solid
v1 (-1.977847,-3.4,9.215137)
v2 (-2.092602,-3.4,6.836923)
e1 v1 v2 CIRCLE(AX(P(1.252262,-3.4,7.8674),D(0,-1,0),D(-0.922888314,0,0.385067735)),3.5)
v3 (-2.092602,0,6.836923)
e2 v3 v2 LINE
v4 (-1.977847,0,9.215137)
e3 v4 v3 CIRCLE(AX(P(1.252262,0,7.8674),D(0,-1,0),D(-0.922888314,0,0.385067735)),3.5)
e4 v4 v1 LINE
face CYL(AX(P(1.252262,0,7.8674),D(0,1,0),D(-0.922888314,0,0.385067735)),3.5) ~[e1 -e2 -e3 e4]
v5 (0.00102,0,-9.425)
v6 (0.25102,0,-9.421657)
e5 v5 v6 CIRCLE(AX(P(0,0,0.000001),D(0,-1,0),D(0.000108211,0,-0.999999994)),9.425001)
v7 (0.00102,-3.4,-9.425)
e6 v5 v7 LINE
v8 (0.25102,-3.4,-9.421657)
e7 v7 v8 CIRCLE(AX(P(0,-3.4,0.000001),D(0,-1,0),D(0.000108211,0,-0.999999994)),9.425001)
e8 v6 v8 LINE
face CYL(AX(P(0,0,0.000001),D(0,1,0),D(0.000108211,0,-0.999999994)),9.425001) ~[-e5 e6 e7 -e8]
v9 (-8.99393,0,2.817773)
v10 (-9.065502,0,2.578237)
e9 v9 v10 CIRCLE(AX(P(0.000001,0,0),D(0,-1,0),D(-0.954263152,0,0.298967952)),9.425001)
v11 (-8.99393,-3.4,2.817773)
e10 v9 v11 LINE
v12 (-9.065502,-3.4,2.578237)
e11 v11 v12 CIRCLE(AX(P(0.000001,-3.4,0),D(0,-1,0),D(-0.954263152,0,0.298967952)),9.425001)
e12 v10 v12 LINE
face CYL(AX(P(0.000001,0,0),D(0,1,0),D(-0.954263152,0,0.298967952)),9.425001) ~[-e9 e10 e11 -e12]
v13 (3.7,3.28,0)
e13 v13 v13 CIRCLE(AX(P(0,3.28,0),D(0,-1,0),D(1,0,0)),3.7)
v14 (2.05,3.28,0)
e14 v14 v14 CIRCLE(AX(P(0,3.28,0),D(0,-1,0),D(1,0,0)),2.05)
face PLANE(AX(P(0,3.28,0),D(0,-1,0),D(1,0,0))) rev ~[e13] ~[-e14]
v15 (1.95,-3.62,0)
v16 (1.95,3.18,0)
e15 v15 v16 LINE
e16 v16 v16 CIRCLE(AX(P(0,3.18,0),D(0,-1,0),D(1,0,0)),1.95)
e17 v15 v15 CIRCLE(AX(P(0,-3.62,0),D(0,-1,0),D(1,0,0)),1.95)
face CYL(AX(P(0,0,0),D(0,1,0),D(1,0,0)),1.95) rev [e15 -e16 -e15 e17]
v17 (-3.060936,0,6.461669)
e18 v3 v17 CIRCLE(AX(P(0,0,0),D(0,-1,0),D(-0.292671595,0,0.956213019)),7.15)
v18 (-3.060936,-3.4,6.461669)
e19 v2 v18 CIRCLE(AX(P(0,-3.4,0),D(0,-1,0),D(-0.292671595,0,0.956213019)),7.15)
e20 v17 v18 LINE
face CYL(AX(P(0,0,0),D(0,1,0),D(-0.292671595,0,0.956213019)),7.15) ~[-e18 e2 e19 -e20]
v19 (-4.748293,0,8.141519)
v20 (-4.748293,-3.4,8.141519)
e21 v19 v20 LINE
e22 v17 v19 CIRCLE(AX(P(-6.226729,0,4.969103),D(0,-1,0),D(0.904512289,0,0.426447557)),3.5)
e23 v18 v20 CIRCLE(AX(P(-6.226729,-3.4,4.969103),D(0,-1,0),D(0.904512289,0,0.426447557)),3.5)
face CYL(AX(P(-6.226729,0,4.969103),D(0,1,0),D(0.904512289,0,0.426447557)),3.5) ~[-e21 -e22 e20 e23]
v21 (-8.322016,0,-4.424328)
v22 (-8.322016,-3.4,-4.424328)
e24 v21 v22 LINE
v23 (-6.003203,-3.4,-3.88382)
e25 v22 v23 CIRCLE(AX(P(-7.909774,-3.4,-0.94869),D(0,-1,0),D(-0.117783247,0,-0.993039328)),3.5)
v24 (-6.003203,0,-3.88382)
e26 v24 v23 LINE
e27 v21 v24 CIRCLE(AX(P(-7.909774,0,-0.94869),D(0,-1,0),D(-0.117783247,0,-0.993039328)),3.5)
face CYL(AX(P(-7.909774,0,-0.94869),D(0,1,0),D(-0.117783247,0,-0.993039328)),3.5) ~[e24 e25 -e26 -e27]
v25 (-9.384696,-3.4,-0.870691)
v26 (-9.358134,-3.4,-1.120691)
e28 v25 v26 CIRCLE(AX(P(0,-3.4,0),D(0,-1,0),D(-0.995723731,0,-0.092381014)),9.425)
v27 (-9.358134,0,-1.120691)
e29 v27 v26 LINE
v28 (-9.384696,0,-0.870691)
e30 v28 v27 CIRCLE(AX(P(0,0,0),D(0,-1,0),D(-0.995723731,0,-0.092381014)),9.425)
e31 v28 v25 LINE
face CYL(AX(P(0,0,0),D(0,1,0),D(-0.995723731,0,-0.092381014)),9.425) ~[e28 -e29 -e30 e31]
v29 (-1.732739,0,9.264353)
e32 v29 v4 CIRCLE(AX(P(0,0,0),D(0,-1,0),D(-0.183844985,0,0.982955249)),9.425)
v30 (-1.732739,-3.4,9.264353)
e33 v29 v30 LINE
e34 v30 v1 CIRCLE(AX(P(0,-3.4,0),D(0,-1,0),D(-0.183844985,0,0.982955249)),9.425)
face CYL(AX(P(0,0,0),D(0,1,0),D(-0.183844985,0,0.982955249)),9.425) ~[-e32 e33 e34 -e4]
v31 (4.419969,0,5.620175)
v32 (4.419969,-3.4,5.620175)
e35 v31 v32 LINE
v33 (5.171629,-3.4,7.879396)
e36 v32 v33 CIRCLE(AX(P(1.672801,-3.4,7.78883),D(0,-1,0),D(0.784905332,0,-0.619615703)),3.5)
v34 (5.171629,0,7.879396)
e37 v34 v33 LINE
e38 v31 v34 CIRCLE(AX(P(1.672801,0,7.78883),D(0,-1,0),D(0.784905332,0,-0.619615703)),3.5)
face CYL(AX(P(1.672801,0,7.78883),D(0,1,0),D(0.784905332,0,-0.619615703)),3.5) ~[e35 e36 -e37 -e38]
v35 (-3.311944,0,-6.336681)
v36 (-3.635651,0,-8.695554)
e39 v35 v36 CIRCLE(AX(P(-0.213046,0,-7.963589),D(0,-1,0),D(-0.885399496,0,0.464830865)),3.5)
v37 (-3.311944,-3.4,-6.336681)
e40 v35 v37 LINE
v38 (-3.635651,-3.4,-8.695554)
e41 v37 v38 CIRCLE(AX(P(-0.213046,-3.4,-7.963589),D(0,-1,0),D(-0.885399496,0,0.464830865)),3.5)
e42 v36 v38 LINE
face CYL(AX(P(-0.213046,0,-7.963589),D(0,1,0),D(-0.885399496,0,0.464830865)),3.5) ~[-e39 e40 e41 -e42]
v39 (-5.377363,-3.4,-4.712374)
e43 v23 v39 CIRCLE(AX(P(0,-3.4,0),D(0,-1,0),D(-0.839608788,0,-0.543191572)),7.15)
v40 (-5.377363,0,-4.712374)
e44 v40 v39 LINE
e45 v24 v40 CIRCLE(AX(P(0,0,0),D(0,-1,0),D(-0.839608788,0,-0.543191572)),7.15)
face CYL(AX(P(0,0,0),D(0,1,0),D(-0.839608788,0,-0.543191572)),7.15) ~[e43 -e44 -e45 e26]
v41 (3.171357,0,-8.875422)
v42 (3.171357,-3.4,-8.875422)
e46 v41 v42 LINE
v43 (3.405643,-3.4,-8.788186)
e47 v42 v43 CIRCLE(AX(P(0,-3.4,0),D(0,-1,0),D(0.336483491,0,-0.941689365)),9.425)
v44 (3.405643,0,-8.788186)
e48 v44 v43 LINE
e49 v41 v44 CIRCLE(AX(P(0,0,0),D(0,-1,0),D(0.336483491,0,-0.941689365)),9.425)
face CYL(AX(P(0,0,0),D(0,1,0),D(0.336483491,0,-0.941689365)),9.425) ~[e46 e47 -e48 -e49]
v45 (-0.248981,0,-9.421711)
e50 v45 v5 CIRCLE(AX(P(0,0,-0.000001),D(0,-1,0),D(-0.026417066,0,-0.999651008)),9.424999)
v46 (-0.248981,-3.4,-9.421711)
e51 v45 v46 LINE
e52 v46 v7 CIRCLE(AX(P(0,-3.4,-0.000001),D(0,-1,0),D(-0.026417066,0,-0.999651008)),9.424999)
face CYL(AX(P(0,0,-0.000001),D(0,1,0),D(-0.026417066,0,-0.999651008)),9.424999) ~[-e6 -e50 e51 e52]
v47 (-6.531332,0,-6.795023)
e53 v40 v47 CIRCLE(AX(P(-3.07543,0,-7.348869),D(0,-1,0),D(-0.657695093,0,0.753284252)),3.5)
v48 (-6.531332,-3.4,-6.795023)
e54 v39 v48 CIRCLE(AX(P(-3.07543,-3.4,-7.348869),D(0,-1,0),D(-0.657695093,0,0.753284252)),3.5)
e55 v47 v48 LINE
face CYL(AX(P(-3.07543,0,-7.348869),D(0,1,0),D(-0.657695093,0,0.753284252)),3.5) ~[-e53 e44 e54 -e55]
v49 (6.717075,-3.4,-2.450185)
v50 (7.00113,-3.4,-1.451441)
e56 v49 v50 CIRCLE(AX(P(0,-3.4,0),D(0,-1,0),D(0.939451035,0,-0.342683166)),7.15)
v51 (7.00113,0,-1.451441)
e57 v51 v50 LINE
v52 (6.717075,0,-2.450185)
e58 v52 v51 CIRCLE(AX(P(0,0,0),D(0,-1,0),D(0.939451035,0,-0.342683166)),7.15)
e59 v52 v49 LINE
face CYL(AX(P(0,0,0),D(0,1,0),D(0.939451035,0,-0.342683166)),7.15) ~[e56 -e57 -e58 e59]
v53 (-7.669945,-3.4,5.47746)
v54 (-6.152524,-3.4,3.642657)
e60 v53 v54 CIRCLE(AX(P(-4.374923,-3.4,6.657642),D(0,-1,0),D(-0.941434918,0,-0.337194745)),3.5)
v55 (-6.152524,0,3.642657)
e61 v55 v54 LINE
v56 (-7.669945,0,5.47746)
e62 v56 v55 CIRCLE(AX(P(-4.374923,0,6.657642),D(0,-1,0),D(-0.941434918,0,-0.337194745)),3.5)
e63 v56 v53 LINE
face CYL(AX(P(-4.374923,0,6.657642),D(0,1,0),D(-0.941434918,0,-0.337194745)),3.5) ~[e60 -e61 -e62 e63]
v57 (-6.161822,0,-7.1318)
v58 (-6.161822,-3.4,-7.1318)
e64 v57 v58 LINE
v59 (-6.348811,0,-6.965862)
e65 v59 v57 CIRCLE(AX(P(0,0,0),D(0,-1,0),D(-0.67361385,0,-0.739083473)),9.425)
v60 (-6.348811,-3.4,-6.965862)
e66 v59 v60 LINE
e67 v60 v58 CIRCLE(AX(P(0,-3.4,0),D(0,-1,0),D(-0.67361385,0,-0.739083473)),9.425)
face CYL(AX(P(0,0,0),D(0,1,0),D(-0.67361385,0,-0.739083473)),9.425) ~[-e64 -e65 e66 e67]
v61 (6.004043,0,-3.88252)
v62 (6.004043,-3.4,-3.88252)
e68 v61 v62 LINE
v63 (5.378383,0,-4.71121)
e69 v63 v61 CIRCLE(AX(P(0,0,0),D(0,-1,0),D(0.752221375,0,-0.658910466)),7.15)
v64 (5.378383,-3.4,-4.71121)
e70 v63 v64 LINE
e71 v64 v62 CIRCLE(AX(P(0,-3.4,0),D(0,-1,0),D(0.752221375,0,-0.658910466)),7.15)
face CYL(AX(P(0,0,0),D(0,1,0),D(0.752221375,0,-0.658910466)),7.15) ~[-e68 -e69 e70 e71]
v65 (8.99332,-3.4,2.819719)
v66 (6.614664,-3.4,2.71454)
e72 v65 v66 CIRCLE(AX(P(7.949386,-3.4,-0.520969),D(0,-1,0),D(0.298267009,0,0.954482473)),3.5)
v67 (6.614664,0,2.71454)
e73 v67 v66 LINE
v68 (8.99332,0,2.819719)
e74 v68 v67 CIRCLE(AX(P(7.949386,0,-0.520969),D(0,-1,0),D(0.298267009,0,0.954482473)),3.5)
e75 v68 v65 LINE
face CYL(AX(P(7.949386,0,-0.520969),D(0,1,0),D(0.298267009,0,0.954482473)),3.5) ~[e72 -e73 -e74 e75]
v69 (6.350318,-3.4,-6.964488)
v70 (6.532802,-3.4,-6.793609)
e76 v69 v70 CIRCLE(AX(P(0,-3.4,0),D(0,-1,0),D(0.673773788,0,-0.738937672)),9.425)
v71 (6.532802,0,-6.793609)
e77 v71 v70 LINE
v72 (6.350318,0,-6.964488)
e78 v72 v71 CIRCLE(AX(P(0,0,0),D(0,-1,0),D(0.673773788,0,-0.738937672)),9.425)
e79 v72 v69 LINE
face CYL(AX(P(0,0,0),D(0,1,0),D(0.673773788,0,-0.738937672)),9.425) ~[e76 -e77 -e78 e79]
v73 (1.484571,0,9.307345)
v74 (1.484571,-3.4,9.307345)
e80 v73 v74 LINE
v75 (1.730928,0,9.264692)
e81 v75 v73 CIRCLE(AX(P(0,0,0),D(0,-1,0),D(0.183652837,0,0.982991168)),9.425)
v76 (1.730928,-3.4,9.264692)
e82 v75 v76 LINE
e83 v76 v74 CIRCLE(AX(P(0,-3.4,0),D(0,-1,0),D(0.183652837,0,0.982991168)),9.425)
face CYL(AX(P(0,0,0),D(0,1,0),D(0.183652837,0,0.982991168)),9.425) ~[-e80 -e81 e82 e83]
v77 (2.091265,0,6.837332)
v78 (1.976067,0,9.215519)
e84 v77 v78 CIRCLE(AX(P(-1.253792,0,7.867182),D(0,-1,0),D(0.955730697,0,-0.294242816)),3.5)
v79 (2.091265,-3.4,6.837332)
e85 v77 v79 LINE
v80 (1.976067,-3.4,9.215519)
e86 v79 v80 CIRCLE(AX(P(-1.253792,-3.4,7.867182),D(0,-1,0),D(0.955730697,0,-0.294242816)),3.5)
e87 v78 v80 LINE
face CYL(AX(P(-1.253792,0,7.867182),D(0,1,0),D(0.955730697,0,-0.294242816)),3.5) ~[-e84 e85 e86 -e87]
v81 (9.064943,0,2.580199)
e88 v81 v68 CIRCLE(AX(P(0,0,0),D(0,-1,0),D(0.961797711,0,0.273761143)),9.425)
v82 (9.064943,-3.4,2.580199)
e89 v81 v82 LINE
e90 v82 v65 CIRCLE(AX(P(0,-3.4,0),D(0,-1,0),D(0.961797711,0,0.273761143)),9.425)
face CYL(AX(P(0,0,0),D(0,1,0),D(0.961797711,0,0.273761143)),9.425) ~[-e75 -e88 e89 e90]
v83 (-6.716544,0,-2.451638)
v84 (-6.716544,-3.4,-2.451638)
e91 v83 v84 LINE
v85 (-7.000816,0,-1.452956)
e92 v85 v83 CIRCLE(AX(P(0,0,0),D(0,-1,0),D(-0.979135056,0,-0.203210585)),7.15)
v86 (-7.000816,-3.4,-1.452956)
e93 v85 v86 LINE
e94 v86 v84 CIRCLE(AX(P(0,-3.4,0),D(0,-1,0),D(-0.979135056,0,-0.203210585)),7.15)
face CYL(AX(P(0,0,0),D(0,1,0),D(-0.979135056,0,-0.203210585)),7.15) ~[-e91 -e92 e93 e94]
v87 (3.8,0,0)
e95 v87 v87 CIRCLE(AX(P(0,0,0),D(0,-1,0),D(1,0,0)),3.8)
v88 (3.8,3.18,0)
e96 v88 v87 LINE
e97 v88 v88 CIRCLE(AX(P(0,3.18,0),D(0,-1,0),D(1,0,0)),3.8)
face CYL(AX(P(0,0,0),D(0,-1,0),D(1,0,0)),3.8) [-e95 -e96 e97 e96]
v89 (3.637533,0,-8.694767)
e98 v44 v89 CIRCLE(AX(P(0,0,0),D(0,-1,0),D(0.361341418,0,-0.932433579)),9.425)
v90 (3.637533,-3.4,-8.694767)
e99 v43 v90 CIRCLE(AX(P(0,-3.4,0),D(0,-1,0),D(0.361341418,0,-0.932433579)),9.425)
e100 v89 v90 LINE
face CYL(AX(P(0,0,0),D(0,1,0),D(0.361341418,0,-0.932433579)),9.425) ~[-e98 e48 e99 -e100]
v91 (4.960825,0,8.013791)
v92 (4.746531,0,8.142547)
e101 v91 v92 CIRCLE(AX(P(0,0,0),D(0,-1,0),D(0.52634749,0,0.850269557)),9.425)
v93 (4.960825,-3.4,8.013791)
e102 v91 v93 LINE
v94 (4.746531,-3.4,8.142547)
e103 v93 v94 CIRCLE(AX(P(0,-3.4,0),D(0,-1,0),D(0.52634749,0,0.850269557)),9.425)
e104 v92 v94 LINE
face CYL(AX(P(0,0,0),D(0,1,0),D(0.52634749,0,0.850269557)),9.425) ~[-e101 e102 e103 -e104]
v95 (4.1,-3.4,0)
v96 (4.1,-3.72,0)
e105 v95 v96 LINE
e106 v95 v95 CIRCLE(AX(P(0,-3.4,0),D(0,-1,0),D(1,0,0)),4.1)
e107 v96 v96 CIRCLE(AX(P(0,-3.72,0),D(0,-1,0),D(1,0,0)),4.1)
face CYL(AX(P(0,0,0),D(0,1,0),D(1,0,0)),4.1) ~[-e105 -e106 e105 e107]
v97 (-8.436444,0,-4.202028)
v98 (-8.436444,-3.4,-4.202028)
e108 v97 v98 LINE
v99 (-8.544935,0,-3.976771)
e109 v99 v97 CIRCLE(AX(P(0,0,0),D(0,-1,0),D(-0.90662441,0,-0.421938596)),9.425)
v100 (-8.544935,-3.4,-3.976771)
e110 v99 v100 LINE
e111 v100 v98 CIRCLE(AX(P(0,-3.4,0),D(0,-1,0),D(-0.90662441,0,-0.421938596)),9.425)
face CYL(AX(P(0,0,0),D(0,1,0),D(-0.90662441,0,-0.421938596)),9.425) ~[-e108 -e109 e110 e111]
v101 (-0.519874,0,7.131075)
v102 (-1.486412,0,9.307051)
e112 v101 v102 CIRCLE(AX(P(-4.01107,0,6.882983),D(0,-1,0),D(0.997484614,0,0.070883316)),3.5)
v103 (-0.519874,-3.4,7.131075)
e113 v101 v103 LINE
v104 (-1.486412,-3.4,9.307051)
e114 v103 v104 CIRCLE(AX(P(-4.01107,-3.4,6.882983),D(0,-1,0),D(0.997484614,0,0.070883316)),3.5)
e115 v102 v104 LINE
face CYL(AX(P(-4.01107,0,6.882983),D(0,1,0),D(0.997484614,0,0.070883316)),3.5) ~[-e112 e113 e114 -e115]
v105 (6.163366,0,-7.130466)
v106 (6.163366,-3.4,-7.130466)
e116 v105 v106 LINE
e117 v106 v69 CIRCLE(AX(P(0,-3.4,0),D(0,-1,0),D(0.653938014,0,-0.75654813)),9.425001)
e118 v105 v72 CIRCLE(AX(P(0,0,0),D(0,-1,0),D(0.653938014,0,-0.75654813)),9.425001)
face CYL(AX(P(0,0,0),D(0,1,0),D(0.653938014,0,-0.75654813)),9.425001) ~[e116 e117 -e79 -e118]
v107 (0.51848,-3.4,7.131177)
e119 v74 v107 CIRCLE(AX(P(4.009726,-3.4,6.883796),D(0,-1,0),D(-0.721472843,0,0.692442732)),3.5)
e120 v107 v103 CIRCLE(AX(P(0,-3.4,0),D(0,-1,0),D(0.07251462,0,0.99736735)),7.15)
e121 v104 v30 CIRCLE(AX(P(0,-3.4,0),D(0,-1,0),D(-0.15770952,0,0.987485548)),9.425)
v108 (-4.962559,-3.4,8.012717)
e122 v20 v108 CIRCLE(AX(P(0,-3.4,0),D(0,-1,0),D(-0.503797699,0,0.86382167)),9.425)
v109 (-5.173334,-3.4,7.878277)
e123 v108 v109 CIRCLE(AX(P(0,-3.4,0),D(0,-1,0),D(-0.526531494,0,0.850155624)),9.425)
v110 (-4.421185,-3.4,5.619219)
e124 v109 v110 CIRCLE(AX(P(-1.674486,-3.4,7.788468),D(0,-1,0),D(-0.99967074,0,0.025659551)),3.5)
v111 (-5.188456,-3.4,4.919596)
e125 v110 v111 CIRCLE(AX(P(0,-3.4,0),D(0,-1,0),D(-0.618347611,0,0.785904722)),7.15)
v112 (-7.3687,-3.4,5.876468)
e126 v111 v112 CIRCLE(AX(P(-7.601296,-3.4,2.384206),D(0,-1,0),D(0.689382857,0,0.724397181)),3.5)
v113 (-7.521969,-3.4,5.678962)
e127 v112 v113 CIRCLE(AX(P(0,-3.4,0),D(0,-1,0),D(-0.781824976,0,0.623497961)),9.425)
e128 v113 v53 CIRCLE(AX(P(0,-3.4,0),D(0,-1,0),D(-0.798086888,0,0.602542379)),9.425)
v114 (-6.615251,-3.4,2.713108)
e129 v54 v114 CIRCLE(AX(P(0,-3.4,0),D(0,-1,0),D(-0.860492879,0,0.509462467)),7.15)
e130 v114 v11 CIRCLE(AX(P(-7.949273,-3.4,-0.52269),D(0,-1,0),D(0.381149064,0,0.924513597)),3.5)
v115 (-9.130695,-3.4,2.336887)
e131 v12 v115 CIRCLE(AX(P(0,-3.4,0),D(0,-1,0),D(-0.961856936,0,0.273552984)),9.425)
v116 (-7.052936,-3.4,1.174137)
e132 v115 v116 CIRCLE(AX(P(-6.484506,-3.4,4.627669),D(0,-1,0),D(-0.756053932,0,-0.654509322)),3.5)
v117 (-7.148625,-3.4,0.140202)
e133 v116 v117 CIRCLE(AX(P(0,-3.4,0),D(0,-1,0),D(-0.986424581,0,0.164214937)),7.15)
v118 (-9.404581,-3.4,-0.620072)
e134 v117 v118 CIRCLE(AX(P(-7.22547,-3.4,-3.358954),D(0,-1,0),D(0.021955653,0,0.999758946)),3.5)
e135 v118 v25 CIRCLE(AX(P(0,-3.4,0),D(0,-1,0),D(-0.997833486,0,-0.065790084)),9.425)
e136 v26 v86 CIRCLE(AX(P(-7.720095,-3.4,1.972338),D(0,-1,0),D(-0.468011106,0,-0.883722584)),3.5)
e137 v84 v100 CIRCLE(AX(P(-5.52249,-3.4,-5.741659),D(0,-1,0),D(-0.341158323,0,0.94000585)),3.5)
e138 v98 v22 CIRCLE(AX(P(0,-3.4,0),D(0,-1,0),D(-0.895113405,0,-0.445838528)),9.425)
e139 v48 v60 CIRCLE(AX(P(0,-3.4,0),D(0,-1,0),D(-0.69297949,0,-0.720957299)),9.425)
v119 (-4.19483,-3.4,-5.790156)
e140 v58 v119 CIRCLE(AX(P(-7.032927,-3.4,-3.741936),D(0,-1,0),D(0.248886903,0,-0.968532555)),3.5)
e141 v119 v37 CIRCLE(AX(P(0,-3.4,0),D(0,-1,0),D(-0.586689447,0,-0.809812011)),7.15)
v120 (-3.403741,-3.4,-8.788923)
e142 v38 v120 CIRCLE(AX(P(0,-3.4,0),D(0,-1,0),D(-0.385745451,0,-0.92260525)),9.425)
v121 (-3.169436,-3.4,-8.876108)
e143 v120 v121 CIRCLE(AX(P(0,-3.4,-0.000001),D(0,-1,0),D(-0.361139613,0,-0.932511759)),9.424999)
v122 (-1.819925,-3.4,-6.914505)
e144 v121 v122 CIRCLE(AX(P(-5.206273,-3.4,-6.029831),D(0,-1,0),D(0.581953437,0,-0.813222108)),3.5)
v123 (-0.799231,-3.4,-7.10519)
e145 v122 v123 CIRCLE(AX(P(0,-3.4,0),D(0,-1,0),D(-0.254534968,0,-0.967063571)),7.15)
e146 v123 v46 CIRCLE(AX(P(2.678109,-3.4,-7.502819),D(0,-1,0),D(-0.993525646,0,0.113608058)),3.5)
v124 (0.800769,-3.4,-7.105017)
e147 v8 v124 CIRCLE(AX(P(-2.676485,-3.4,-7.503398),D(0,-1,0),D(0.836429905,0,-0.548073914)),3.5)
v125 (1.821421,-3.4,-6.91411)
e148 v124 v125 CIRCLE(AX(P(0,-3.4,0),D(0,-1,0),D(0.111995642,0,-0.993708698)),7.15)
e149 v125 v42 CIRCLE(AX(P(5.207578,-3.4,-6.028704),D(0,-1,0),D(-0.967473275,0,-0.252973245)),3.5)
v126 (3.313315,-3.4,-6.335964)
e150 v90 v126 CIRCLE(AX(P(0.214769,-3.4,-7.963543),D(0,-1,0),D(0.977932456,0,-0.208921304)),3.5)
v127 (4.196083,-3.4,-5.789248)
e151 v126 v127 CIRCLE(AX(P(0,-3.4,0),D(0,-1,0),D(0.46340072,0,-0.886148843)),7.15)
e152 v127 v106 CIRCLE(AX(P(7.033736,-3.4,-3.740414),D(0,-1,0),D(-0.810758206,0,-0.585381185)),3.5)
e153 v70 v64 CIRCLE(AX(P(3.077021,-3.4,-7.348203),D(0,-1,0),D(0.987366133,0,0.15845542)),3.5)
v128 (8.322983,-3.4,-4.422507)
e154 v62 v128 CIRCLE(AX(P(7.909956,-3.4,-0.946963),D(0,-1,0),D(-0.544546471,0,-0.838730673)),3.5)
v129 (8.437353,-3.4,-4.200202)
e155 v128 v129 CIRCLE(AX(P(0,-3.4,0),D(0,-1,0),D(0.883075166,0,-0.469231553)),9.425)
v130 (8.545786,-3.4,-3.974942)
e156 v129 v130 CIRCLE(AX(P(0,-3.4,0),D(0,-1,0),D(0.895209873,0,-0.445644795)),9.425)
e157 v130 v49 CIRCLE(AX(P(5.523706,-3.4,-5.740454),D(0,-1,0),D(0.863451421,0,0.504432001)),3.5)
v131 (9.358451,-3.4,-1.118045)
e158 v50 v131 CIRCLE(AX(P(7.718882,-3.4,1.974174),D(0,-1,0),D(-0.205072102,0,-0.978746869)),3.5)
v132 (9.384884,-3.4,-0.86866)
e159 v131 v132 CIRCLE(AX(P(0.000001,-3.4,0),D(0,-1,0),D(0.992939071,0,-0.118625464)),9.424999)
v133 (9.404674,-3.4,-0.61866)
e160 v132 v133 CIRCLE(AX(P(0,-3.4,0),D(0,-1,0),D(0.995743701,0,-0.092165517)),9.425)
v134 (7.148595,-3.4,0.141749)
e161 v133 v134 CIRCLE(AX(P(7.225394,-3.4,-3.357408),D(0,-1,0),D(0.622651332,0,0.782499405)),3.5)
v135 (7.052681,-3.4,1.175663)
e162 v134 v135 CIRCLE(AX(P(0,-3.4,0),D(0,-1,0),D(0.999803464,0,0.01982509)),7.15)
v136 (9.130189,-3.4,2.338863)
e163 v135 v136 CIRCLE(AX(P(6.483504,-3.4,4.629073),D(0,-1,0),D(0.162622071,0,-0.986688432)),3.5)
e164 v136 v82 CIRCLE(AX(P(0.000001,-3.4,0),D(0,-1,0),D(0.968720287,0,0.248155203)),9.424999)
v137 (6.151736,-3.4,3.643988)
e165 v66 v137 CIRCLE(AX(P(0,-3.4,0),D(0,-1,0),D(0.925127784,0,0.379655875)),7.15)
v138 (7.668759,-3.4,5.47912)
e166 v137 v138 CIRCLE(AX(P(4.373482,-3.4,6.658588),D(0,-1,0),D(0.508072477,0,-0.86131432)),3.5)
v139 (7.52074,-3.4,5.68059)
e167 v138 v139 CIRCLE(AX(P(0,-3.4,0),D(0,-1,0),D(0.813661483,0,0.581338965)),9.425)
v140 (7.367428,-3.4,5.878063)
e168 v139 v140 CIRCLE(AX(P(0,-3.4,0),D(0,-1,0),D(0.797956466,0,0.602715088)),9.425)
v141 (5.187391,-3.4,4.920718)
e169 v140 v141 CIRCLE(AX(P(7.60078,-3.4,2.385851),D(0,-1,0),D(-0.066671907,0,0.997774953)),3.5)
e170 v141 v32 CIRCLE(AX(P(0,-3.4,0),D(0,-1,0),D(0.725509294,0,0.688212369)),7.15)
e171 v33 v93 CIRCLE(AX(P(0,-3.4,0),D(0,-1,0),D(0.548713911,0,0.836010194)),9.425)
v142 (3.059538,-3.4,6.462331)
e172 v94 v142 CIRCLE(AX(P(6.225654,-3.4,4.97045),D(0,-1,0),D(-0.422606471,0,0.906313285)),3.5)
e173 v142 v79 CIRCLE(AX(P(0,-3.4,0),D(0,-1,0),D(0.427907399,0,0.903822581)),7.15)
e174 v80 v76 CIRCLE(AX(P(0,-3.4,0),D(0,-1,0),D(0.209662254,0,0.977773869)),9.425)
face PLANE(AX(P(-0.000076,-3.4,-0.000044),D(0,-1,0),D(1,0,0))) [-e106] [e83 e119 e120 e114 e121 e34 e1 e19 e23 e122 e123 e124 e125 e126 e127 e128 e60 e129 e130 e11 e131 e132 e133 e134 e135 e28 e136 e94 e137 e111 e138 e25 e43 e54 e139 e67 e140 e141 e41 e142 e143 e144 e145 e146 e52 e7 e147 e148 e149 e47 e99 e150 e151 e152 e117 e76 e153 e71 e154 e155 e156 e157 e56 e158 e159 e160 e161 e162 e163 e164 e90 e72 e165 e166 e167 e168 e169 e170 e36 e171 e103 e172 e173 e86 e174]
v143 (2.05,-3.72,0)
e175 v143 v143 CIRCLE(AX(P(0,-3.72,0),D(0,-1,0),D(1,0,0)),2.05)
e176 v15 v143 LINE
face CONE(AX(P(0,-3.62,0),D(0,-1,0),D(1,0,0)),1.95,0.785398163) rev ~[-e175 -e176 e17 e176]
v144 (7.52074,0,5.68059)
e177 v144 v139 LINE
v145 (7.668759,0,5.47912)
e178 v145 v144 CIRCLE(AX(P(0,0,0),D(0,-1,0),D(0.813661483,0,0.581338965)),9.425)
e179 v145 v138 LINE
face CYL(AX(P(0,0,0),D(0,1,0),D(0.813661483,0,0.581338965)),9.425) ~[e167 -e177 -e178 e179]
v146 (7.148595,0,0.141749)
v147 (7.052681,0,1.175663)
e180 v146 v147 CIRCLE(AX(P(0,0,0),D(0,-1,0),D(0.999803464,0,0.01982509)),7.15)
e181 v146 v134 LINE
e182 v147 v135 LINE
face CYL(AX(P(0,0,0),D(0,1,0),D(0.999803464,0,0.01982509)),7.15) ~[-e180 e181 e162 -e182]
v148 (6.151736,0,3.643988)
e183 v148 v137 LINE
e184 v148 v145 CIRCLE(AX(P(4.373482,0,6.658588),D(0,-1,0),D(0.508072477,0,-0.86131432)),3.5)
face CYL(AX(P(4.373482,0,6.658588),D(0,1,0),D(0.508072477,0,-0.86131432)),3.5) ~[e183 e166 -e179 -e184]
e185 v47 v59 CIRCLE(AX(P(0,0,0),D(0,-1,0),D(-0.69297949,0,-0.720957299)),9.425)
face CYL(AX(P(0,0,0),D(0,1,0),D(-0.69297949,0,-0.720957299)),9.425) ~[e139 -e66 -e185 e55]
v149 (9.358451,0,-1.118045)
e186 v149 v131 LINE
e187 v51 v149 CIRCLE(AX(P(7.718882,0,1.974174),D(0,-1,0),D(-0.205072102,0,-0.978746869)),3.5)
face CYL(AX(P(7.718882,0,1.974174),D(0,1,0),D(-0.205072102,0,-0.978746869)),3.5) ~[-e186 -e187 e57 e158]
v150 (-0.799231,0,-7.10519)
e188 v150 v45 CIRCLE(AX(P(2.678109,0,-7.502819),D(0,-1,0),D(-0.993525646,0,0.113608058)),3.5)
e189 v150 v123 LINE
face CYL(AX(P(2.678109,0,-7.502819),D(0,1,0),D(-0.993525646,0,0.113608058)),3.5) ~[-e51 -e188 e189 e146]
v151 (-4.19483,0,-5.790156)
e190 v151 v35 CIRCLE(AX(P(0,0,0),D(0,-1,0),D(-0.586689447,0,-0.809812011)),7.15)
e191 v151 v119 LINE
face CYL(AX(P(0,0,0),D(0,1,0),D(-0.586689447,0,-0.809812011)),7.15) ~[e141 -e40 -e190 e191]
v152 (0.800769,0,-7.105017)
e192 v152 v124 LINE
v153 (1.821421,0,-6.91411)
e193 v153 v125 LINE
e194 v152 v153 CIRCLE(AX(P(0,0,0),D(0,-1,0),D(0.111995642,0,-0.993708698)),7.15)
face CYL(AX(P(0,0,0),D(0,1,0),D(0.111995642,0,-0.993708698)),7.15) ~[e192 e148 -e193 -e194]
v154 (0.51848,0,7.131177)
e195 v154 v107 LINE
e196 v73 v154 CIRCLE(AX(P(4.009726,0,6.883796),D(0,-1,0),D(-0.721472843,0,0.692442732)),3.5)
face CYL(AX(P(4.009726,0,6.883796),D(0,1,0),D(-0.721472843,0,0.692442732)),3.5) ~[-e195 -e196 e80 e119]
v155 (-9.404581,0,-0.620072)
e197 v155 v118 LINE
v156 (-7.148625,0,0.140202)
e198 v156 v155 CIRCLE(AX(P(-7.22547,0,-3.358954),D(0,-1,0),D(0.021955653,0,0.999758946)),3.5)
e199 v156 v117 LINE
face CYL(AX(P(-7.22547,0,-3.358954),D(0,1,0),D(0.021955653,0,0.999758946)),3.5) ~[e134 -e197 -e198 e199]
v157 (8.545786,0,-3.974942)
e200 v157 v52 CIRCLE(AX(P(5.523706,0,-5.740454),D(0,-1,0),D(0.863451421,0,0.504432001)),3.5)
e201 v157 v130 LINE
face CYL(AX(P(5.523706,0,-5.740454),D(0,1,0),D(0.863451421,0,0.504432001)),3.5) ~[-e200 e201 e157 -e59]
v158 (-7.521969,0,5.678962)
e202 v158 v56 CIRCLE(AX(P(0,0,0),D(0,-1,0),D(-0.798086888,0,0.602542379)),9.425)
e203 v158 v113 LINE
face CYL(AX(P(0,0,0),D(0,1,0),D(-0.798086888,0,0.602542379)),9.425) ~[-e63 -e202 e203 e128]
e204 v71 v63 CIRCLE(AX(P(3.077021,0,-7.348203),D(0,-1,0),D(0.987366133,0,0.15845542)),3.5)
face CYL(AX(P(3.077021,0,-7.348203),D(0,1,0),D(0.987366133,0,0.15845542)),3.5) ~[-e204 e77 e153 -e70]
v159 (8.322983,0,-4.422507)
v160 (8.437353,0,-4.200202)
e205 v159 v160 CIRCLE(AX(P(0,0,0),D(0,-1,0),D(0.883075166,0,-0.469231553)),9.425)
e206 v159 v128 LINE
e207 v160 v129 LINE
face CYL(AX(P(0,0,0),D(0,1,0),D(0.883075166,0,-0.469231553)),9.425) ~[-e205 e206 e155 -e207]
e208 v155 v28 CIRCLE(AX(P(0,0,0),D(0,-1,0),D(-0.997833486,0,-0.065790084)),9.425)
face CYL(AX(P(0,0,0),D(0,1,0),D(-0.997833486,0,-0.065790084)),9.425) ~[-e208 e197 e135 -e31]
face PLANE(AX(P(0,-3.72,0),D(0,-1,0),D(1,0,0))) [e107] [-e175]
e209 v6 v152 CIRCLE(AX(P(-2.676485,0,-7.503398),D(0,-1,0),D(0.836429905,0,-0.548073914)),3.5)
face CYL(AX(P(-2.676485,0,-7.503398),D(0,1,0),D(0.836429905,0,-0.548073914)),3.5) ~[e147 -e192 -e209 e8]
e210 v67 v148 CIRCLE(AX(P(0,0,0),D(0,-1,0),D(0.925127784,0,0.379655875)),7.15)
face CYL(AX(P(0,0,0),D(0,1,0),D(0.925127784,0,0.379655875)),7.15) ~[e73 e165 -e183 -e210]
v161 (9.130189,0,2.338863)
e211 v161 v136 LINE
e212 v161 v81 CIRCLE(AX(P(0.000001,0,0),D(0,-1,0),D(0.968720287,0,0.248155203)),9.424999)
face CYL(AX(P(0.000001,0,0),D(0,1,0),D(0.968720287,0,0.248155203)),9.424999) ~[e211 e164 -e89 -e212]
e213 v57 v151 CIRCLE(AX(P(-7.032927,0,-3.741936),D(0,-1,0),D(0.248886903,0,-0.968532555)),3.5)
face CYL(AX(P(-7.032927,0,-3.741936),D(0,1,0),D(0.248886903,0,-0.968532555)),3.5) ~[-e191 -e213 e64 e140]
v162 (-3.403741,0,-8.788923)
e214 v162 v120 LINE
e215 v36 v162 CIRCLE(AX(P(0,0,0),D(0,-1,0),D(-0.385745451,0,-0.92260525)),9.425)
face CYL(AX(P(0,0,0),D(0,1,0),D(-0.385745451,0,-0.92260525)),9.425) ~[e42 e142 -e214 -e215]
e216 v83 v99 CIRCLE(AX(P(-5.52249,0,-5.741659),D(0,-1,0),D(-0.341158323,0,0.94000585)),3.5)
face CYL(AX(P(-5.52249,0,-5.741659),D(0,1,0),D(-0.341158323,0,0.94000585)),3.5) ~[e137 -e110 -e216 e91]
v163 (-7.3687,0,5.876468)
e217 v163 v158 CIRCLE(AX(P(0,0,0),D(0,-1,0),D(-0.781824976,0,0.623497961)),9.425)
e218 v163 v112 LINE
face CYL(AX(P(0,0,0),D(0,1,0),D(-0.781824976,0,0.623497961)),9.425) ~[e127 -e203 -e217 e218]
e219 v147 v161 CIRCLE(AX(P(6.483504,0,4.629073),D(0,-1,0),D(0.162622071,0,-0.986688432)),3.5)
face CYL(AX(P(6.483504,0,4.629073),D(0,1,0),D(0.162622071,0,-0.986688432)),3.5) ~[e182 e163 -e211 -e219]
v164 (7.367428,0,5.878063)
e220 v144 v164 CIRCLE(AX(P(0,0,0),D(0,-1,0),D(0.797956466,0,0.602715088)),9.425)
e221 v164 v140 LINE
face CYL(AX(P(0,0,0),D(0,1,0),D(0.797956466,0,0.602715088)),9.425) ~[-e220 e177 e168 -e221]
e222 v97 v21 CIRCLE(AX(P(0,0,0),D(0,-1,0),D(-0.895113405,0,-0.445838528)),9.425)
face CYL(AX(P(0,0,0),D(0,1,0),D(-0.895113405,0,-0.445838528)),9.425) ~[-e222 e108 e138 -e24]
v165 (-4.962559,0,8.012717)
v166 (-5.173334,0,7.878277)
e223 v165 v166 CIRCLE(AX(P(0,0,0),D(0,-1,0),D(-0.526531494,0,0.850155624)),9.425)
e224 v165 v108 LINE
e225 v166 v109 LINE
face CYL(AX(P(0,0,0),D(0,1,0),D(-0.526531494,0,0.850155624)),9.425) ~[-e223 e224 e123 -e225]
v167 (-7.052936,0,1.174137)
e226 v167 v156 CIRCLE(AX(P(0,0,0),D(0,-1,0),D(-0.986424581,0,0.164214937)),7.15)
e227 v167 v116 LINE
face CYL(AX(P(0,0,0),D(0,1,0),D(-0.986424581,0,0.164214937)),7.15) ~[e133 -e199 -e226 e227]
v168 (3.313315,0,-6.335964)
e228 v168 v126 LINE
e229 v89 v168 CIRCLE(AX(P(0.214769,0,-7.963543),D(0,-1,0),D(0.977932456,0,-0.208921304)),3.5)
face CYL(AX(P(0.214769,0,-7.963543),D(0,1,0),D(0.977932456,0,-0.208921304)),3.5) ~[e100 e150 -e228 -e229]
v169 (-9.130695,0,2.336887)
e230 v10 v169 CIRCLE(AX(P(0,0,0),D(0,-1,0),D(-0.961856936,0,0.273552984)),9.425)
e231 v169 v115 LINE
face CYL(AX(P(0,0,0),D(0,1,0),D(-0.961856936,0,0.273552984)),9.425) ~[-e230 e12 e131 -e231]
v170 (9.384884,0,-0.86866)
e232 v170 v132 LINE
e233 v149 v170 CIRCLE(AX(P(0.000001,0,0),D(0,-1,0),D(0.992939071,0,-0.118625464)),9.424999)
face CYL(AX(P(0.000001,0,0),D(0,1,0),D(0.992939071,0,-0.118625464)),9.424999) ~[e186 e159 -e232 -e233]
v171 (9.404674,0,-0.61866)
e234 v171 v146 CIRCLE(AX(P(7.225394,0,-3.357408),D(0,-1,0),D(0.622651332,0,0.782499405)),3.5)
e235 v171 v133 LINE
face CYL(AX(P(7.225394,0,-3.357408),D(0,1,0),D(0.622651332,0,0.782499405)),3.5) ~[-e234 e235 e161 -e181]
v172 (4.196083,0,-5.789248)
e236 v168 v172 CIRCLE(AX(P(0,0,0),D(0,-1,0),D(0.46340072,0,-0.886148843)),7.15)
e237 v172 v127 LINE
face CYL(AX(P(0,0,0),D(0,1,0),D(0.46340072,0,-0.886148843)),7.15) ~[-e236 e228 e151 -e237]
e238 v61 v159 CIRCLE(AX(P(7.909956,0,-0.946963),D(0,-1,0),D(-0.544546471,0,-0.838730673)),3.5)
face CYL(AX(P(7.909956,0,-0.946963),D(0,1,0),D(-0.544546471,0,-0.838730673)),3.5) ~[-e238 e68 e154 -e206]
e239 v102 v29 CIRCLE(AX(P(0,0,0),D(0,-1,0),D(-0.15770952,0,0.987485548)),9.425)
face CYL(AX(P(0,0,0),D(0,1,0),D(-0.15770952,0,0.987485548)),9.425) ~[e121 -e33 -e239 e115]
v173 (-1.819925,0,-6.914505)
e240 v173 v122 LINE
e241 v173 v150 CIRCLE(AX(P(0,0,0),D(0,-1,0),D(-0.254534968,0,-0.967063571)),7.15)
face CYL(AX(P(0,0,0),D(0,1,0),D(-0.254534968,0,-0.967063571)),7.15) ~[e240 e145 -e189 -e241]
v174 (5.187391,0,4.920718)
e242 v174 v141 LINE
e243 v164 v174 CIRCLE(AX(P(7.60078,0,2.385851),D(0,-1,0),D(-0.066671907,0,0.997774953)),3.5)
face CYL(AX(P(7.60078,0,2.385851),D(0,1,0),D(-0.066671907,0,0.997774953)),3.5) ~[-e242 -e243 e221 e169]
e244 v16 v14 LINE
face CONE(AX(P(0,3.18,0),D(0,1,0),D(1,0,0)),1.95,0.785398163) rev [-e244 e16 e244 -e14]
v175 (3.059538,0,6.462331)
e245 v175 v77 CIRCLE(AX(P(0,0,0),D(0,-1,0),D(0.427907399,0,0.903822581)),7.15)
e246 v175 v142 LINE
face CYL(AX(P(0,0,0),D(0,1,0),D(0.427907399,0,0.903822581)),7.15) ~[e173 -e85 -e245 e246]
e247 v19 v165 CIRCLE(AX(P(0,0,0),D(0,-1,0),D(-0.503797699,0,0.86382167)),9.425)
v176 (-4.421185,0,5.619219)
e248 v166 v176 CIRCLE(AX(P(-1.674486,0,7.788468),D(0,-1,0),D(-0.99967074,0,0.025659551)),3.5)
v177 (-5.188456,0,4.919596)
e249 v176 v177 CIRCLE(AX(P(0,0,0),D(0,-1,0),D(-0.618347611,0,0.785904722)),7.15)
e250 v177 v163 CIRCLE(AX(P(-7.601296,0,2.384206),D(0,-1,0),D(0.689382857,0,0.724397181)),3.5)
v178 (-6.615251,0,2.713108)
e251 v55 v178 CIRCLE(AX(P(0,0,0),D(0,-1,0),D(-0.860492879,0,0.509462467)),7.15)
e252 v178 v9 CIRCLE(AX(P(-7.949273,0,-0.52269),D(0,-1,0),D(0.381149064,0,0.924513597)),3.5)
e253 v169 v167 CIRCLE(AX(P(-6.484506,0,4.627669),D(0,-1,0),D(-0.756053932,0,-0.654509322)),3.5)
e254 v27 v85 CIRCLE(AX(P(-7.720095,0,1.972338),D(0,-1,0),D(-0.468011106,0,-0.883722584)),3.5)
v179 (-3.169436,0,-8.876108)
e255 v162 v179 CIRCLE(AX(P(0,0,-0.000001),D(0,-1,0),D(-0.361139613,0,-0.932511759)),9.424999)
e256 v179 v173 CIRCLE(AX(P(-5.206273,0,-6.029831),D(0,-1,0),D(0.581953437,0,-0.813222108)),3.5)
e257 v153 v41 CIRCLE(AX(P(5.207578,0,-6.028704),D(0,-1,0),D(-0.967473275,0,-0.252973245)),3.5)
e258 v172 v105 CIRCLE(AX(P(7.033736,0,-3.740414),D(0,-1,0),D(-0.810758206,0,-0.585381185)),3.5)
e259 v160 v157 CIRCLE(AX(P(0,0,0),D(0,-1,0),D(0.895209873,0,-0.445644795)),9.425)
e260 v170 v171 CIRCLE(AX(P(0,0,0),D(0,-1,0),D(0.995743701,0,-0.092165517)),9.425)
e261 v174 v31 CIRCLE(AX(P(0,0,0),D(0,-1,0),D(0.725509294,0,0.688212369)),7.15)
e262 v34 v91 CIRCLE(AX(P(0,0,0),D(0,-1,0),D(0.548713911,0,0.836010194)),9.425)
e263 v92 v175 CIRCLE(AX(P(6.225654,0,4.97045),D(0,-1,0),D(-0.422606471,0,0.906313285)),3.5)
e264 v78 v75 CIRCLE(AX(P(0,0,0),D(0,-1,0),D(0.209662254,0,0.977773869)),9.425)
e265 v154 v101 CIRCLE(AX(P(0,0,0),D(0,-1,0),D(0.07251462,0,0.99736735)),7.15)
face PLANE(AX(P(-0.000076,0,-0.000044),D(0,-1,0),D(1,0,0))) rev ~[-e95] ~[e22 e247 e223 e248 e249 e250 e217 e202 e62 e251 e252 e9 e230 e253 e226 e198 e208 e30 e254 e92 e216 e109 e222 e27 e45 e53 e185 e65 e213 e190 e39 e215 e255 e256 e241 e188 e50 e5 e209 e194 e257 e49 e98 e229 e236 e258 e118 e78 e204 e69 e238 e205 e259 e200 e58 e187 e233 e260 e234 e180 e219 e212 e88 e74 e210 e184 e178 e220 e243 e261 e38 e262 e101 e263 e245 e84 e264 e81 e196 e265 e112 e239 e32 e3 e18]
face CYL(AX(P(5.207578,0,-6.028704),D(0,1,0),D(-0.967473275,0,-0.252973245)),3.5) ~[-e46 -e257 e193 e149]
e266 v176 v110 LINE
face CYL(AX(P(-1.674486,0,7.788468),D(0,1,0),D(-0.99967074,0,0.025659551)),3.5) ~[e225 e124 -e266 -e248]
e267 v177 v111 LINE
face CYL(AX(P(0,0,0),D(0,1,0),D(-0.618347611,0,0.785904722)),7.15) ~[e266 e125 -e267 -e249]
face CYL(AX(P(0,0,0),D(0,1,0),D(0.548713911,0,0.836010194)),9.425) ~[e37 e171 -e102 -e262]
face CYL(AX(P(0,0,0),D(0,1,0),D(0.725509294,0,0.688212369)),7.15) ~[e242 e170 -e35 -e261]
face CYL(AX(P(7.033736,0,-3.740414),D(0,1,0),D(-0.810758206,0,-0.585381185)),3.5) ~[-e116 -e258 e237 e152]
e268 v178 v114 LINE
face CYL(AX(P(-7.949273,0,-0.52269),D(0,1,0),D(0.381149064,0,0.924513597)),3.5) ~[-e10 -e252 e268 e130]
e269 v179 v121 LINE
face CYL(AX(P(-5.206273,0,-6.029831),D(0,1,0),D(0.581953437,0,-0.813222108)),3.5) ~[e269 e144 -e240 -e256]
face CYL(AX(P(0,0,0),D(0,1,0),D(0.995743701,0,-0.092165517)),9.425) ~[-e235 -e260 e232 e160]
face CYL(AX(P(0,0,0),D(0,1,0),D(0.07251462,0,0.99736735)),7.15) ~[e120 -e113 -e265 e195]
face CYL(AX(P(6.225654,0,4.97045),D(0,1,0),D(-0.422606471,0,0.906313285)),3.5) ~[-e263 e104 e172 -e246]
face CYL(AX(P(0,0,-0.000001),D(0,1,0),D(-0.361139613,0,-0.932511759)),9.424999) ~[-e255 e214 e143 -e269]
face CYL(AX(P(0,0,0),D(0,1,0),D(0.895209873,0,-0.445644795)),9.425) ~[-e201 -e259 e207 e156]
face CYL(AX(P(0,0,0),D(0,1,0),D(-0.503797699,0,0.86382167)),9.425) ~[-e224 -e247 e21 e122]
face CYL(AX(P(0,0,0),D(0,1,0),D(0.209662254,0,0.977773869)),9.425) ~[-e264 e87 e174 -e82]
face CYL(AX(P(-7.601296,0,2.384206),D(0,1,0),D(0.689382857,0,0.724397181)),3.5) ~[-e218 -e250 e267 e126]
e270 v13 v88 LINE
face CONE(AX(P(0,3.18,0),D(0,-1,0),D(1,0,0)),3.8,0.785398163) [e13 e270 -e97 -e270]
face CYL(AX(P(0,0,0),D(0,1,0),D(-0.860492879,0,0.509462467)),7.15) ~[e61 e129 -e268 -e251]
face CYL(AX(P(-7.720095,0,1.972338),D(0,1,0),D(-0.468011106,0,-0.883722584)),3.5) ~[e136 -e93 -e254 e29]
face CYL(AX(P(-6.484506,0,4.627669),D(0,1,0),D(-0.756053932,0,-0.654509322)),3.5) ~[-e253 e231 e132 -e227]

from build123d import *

# Parameters (mm, degrees)
F0_R     = 4.1
F1_DEPTH = 3.4
F0_R_2   = 3.8
F0_R_3   = 1.95
F2_DEPTH = 3.72
F3_DEPTH = 3.28
F4_SIZE  = 0.1
F5_SIZE  = 0.1
F6_SIZE  = 0.1
F7_DEPTH = 3.72


# Not quite as in the source:
# - a feature names something its author has since deleted; it is built from what else it names


with BuildPart() as f1:
    # F0 (on Front) → F1 (new body)
    with BuildSketch(Plane.XZ):
        with BuildLine():
            ThreePointArc((-9.1306946704, 2.3368867827), (-8.1937279785, 1.5734002793), (-7.0529357563, 1.1741367966))
            ThreePointArc((-7.0529357563, 1.1741367966), (-7.1195743604, 0.6589088915), (-7.1486252748, 0.1402022865))
            ThreePointArc((-7.1486252748, 0.1402022865), (-8.3432287104, -0.042236429), (-9.4045806012, -0.6200715414))
            ThreePointArc((-9.4045806012, -0.6200715414), (-9.3954740629, -0.7454476061), (-9.384696163, -0.870691063))
            ThreePointArc((-9.384696163, -0.870691063), (-9.3722488189, -0.9957796327), (-9.3581342447, -1.120691063))
            ThreePointArc((-9.3581342447, -1.120691063), (-8.2085925976, -1.4934044314), (-7.0008156513, -1.4529556828))
            ThreePointArc((-7.0008156513, -1.4529556828), (-6.8768331336, -1.9574641892), (-6.7165444751, -2.4516382918))
            ThreePointArc((-6.7165444751, -2.4516382918), (-7.76441436, -3.053950319), (-8.544935067, -3.9767712658))
            ThreePointArc((-8.544935067, -3.9767712658), (-8.4914364249, -4.0897594601), (-8.43644384, -4.2020281216))
            ThreePointArc((-8.43644384, -4.2020281216), (-8.3799669873, -4.3135574983), (-8.3220158032, -4.4243279682))
            ThreePointArc((-8.3220158032, -4.4243279682), (-7.1152349462, -4.3573127689), (-6.0032028311, -3.8838197394))
            ThreePointArc((-6.0032028311, -3.8838197394), (-5.7053436074, -4.3094726268), (-5.3773631048, -4.7123737159))
            ThreePointArc((-5.3773631048, -4.7123737159), (-6.1368874979, -5.6525550384), (-6.5313316874, -6.7950225452))
            ThreePointArc((-6.5313316874, -6.7950225452), (-6.4406375804, -6.8810473446), (-6.3488105376, -6.9658617383))
            ThreePointArc((-6.3488105376, -6.9658617383), (-6.255866712, -7.0494508071), (-6.1618224526, -7.1317998474))
            ThreePointArc((-6.1618224526, -7.1317998474), (-5.0607335264, -6.6333809478), (-4.1948295471, -5.7901558762))
            ThreePointArc((-4.1948295471, -5.7901558762), (-3.7633208909, -6.0794667424), (-3.3119438366, -6.3366811521))
            ThreePointArc((-3.3119438366, -6.3366811521), (-3.6805479914, -7.487745529), (-3.6356508664, -8.6955544836))
            ThreePointArc((-3.6356508664, -8.6955544836), (-3.5200054468, -8.7430078723), (-3.4037408432, -8.7889233284))
            ThreePointArc((-3.4037408432, -8.7889233284), (-3.2868775071, -8.8332927753), (-3.1694359951, -8.8761084081))
            ThreePointArc((-3.1694359951, -8.8761084081), (-2.3227497605, -8.0135884705), (-1.8199250223, -6.9145045313))
            ThreePointArc((-1.8199250223, -6.9145045313), (-1.3130441845, -7.0284005982), (-0.7992311491, -7.1051903261))
            ThreePointArc((-0.7992311491, -7.1051903261), (-0.727143962, -8.311678782), (-0.2489808346, -9.4217107546))
            ThreePointArc((-0.2489808346, -9.4217107546), (-0.123991383, -9.4241843752), (0.0010198831, -9.4249999448))
            ThreePointArc((0.0010198831, -9.4249999448), (0.1260309698, -9.4241573201), (0.2510198831, -9.4216566494))
            ThreePointArc((0.2510198831, -9.4216566494), (0.7289427654, -8.3115212183), (0.8007688415, -7.1050171895))
            ThreePointArc((0.8007688415, -7.1050171895), (1.3145652461, -7.0281162635), (1.8214214224, -6.9141104997))
            ThreePointArc((1.8214214224, -6.9141104997), (2.3244840135, -8.0130855914), (3.1713568956, -8.8754222683))
            ThreePointArc((3.1713568956, -8.8754222683), (3.2887891386, -8.8325812196), (3.4056428696, -8.7881864821))
            ThreePointArc((3.4056428696, -8.7881864821), (3.5218975334, -8.742245865), (3.6375326803, -8.6947674494))
            ThreePointArc((3.6375326803, -8.6947674494), (3.6821684093, -7.4869488064), (3.3133151488, -6.3359642301))
            ThreePointArc((3.3133151488, -6.3359642301), (3.764636526, -6.078652139), (4.1960825592, -5.7892478921))
            ThreePointArc((4.1960825592, -5.7892478921), (5.0621690097, -6.6322855443), (6.1633657783, -7.1304661337))
            ThreePointArc((6.1633657783, -7.1304661337), (6.2573922134, -7.0480967422), (6.3503179465, -6.9644875604))
            ThreePointArc((6.3503179465, -6.9644875604), (6.4421266315, -6.8796532953), (6.5328021188, -6.7936088699))
            ThreePointArc((6.5328021188, -6.7936088699), (6.1381106848, -5.6512267557), (5.3783828347, -4.7112098322))
            ThreePointArc((5.3783828347, -4.7112098322), (5.7062761334, -4.3082377707), (6.00404323, -3.8825204303))
            ThreePointArc((6.00404323, -3.8825204303), (7.1161845365, -4.3557644871), (8.3229834462, -4.4225073832))
            ThreePointArc((8.3229834462, -4.4225073832), (8.3809053661, -4.3117340184), (8.4373530488, -4.2002022011))
            ThreePointArc((8.4373530488, -4.2002022011), (8.492316565, -4.0879315502), (8.5457862464, -3.9749418147))
            ThreePointArc((8.5457862464, -3.9749418147), (7.7650725635, -3.0522802473), (6.7170749034, -2.4501846343))
            ThreePointArc((6.7170749034, -2.4501846343), (6.8772566086, -1.9559758535), (7.0011299372, -1.4514405265))
            ThreePointArc((7.0011299372, -1.4514405265), (8.2090091905, -1.4913388042), (9.3584507476, -1.1180449923))
            ThreePointArc((9.3584507476, -1.1180449923), (9.3724970598, -0.9934404183), (9.3848843789, -0.868659999))
            ThreePointArc((9.3848843789, -0.868659999), (9.3956105125, -0.7437258211), (9.4046735619, -0.618659999))
            ThreePointArc((9.4046735619, -0.618659999), (8.3432765874, -0.0407321266), (7.1485947646, 0.1417493946))
            ThreePointArc((7.1485947646, 0.1417493946), (7.119431592, 0.6604497002), (7.0526814835, 1.1756631713))
            ThreePointArc((7.0526814835, 1.1756631713), (8.19338727, 1.5751735359), (9.1301887056, 2.3388628005))
            ThreePointArc((9.1301887056, 2.3388628005), (9.0983662855, 2.4597471284), (9.0649434237, 2.5801987762))
            ThreePointArc((9.0649434237, 2.5801987762), (9.0299259996, 2.7001965561), (8.9933201729, 2.8197193598))
            ThreePointArc((8.9933201729, 2.8197193598), (7.794773105, 2.9756140317), (6.6146636541, 2.7145395084))
            ThreePointArc((6.6146636541, 2.7145395084), (6.4000942258, 3.1876784501), (6.1517355927, 3.6439880896))
            ThreePointArc((6.1517355927, 3.6439880896), (7.0710932374, 4.4285897362), (7.6687594725, 5.4791197426))
            ThreePointArc((7.6687594725, 5.4791197426), (7.5954176181, 5.5803455276), (7.5207396972, 5.6805897059))
            ThreePointArc((7.5207396972, 5.6805897059), (7.444738846, 5.7798346442), (7.3674284334, 5.8780628849))
            ThreePointArc((7.3674284334, 5.8780628849), (6.1935005716, 5.5904666436), (5.1873914517, 4.9207184361))
            ThreePointArc((5.1873914517, 4.9207184361), (4.8163943669, 5.2843963991), (4.4199691978, 5.6201754679))
            ThreePointArc((4.4199691978, 5.6201754679), (4.9938151748, 6.683904295), (5.1716286044, 7.8793960795))
            ThreePointArc((5.1716286044, 7.8793960795), (5.0666724743, 7.9472923086), (4.9608250949, 8.0137905749))
            ThreePointArc((4.9608250949, 8.0137905749), (4.8541050851, 8.0788791811), (4.7465312174, 8.1425466779))
            ThreePointArc((4.7465312174, 8.1425466779), (3.7557669795, 7.4503007335), (3.0595379066, 6.4623314522))
            ThreePointArc((3.0595379066, 6.4623314522), (2.5822180472, 6.6674320361), (2.0912654051, 6.8373320093))
            ThreePointArc((2.0912654051, 6.8373320093), (2.2421089696, 8.0365222748), (1.9760667465, 9.2155187165))
            ThreePointArc((1.9760667465, 9.2155187165), (1.8536604305, 9.2409181367), (1.7309279903, 9.2646917538))
            ThreePointArc((1.7309279903, 9.2646917538), (1.6078910188, 9.2868353852), (1.4845711627, 9.307345135))
            ThreePointArc((1.4845711627, 9.307345135), (0.8107889051, 8.3039366723), (0.5184795371, 7.1311765488))
            ThreePointArc((0.5184795371, 7.1311765488), (-0.0006988298, 7.1499999658), (-0.5198735073, 7.1310750618))
            ThreePointArc((-0.5198735073, 7.1310750618), (-0.8124228005, 8.3037784061), (-1.4864122256, 9.307051289))
            ThreePointArc((-1.4864122256, 9.307051289), (-1.609717186, 9.2865190239), (-1.7327389902, 9.2643532204))
            ThreePointArc((-1.7327389902, 9.2643532204), (-1.8554559982, 9.2405577775), (-1.9778466235, 9.2151368809))
            ThreePointArc((-1.9778466235, 9.2151368809), (-2.2436700583, 8.0360880591), (-2.0926019054, 6.8369230846))
            ThreePointArc((-2.0926019054, 6.8369230846), (-2.5835911424, 6.6669000899), (-3.0609364181, 6.4616691531))
            ThreePointArc((-3.0609364181, 6.4616691531), (-3.7573792917, 7.4494877329), (-4.7482933229, 8.141519239))
            ThreePointArc((-4.7482933229, 8.141519239), (-4.8558534091, 8.0778284625), (-4.9625593299, 8.0127167613))
            ThreePointArc((-4.9625593299, 8.0127167613), (-5.0683923152, 7.946195589), (-5.1733337487, 7.8782766469))
            ThreePointArc((-5.1733337487, 7.8782766469), (-4.9952615939, 6.6828233728), (-4.4211854174, 5.6192187629))
            ThreePointArc((-4.4211854174, 5.6192187629), (-4.8175379075, 5.2833539073), (-5.1884562761, 4.9195956613))
            ThreePointArc((-5.1884562761, 4.9195956613), (-6.19471032, 5.5891261102), (-7.3687003961, 5.8764682823))
            ThreePointArc((-7.3687003961, 5.8764682823), (-7.4459895483, 5.7782233123), (-7.521968919, 5.6789619282))
            ThreePointArc((-7.521968919, 5.6789619282), (-7.5966251432, 5.5787015903), (-7.6699450885, 5.477459935))
            ThreePointArc((-7.6699450885, 5.477459935), (-7.0720515108, 4.4270593007), (-6.1525240836, 3.6426566406))
            ThreePointArc((-6.1525240836, 3.6426566406), (-6.4007839559, 3.1862932618), (-6.6152509821, 2.7131078939))
            ThreePointArc((-6.6152509821, 2.7131078939), (-7.7954169073, 2.9739270108), (-8.9939302083, 2.817772952))
            ThreePointArc((-8.9939302083, 2.817772952), (-9.0305101669, 2.6982422288), (-9.0655016202, 2.5782368733))
            ThreePointArc((-9.0655016202, 2.5782368733), (-9.0988984129, 2.4577779948), (-9.1306946704, 2.3368867827))
        make_face()
        Circle(F0_R, mode=Mode.SUBTRACT)
    extrude(amount=F1_DEPTH)



with BuildPart() as f2:
    # F0 (on Front) → F2 (new body)
    with BuildSketch(Plane.XZ):
        Circle(F0_R_2)
        Circle(F0_R_3, mode=Mode.SUBTRACT)
    extrude(amount=F2_DEPTH)

    # F0 (on Front) → F3 (join)
    with BuildSketch(Plane.XZ):
        Circle(F0_R_2)
        Circle(F0_R_3, mode=Mode.SUBTRACT)
    extrude(amount=-F3_DEPTH)

    # F4
    f4_edges = [f2.edges().sort_by_distance(p)[0] for p in [
        (-1.95, 3.28, 0),
    ]]
    chamfer(f4_edges, length=F4_SIZE)

    # F5
    f5_edges = [f2.edges().sort_by_distance(p)[0] for p in [
        (-1.95, -3.72, 0),
    ]]
    chamfer(f5_edges, length=F5_SIZE)

    # F6
    f6_edges = [f2.edges().sort_by_distance(p)[0] for p in [
        (-3.8, 3.28, 0),
    ]]
    chamfer(f6_edges, length=F6_SIZE)


with BuildPart() as f1_1:
    add(f1.part)

    add(f2.part)  # F7 merges F2
    # F0 (on Front) → F7 (join)
    with BuildSketch(Plane.XZ):
        Circle(F0_R)
        Circle(F0_R_2, mode=Mode.SUBTRACT)
    extrude(amount=F7_DEPTH)


solid = f1_1.part
